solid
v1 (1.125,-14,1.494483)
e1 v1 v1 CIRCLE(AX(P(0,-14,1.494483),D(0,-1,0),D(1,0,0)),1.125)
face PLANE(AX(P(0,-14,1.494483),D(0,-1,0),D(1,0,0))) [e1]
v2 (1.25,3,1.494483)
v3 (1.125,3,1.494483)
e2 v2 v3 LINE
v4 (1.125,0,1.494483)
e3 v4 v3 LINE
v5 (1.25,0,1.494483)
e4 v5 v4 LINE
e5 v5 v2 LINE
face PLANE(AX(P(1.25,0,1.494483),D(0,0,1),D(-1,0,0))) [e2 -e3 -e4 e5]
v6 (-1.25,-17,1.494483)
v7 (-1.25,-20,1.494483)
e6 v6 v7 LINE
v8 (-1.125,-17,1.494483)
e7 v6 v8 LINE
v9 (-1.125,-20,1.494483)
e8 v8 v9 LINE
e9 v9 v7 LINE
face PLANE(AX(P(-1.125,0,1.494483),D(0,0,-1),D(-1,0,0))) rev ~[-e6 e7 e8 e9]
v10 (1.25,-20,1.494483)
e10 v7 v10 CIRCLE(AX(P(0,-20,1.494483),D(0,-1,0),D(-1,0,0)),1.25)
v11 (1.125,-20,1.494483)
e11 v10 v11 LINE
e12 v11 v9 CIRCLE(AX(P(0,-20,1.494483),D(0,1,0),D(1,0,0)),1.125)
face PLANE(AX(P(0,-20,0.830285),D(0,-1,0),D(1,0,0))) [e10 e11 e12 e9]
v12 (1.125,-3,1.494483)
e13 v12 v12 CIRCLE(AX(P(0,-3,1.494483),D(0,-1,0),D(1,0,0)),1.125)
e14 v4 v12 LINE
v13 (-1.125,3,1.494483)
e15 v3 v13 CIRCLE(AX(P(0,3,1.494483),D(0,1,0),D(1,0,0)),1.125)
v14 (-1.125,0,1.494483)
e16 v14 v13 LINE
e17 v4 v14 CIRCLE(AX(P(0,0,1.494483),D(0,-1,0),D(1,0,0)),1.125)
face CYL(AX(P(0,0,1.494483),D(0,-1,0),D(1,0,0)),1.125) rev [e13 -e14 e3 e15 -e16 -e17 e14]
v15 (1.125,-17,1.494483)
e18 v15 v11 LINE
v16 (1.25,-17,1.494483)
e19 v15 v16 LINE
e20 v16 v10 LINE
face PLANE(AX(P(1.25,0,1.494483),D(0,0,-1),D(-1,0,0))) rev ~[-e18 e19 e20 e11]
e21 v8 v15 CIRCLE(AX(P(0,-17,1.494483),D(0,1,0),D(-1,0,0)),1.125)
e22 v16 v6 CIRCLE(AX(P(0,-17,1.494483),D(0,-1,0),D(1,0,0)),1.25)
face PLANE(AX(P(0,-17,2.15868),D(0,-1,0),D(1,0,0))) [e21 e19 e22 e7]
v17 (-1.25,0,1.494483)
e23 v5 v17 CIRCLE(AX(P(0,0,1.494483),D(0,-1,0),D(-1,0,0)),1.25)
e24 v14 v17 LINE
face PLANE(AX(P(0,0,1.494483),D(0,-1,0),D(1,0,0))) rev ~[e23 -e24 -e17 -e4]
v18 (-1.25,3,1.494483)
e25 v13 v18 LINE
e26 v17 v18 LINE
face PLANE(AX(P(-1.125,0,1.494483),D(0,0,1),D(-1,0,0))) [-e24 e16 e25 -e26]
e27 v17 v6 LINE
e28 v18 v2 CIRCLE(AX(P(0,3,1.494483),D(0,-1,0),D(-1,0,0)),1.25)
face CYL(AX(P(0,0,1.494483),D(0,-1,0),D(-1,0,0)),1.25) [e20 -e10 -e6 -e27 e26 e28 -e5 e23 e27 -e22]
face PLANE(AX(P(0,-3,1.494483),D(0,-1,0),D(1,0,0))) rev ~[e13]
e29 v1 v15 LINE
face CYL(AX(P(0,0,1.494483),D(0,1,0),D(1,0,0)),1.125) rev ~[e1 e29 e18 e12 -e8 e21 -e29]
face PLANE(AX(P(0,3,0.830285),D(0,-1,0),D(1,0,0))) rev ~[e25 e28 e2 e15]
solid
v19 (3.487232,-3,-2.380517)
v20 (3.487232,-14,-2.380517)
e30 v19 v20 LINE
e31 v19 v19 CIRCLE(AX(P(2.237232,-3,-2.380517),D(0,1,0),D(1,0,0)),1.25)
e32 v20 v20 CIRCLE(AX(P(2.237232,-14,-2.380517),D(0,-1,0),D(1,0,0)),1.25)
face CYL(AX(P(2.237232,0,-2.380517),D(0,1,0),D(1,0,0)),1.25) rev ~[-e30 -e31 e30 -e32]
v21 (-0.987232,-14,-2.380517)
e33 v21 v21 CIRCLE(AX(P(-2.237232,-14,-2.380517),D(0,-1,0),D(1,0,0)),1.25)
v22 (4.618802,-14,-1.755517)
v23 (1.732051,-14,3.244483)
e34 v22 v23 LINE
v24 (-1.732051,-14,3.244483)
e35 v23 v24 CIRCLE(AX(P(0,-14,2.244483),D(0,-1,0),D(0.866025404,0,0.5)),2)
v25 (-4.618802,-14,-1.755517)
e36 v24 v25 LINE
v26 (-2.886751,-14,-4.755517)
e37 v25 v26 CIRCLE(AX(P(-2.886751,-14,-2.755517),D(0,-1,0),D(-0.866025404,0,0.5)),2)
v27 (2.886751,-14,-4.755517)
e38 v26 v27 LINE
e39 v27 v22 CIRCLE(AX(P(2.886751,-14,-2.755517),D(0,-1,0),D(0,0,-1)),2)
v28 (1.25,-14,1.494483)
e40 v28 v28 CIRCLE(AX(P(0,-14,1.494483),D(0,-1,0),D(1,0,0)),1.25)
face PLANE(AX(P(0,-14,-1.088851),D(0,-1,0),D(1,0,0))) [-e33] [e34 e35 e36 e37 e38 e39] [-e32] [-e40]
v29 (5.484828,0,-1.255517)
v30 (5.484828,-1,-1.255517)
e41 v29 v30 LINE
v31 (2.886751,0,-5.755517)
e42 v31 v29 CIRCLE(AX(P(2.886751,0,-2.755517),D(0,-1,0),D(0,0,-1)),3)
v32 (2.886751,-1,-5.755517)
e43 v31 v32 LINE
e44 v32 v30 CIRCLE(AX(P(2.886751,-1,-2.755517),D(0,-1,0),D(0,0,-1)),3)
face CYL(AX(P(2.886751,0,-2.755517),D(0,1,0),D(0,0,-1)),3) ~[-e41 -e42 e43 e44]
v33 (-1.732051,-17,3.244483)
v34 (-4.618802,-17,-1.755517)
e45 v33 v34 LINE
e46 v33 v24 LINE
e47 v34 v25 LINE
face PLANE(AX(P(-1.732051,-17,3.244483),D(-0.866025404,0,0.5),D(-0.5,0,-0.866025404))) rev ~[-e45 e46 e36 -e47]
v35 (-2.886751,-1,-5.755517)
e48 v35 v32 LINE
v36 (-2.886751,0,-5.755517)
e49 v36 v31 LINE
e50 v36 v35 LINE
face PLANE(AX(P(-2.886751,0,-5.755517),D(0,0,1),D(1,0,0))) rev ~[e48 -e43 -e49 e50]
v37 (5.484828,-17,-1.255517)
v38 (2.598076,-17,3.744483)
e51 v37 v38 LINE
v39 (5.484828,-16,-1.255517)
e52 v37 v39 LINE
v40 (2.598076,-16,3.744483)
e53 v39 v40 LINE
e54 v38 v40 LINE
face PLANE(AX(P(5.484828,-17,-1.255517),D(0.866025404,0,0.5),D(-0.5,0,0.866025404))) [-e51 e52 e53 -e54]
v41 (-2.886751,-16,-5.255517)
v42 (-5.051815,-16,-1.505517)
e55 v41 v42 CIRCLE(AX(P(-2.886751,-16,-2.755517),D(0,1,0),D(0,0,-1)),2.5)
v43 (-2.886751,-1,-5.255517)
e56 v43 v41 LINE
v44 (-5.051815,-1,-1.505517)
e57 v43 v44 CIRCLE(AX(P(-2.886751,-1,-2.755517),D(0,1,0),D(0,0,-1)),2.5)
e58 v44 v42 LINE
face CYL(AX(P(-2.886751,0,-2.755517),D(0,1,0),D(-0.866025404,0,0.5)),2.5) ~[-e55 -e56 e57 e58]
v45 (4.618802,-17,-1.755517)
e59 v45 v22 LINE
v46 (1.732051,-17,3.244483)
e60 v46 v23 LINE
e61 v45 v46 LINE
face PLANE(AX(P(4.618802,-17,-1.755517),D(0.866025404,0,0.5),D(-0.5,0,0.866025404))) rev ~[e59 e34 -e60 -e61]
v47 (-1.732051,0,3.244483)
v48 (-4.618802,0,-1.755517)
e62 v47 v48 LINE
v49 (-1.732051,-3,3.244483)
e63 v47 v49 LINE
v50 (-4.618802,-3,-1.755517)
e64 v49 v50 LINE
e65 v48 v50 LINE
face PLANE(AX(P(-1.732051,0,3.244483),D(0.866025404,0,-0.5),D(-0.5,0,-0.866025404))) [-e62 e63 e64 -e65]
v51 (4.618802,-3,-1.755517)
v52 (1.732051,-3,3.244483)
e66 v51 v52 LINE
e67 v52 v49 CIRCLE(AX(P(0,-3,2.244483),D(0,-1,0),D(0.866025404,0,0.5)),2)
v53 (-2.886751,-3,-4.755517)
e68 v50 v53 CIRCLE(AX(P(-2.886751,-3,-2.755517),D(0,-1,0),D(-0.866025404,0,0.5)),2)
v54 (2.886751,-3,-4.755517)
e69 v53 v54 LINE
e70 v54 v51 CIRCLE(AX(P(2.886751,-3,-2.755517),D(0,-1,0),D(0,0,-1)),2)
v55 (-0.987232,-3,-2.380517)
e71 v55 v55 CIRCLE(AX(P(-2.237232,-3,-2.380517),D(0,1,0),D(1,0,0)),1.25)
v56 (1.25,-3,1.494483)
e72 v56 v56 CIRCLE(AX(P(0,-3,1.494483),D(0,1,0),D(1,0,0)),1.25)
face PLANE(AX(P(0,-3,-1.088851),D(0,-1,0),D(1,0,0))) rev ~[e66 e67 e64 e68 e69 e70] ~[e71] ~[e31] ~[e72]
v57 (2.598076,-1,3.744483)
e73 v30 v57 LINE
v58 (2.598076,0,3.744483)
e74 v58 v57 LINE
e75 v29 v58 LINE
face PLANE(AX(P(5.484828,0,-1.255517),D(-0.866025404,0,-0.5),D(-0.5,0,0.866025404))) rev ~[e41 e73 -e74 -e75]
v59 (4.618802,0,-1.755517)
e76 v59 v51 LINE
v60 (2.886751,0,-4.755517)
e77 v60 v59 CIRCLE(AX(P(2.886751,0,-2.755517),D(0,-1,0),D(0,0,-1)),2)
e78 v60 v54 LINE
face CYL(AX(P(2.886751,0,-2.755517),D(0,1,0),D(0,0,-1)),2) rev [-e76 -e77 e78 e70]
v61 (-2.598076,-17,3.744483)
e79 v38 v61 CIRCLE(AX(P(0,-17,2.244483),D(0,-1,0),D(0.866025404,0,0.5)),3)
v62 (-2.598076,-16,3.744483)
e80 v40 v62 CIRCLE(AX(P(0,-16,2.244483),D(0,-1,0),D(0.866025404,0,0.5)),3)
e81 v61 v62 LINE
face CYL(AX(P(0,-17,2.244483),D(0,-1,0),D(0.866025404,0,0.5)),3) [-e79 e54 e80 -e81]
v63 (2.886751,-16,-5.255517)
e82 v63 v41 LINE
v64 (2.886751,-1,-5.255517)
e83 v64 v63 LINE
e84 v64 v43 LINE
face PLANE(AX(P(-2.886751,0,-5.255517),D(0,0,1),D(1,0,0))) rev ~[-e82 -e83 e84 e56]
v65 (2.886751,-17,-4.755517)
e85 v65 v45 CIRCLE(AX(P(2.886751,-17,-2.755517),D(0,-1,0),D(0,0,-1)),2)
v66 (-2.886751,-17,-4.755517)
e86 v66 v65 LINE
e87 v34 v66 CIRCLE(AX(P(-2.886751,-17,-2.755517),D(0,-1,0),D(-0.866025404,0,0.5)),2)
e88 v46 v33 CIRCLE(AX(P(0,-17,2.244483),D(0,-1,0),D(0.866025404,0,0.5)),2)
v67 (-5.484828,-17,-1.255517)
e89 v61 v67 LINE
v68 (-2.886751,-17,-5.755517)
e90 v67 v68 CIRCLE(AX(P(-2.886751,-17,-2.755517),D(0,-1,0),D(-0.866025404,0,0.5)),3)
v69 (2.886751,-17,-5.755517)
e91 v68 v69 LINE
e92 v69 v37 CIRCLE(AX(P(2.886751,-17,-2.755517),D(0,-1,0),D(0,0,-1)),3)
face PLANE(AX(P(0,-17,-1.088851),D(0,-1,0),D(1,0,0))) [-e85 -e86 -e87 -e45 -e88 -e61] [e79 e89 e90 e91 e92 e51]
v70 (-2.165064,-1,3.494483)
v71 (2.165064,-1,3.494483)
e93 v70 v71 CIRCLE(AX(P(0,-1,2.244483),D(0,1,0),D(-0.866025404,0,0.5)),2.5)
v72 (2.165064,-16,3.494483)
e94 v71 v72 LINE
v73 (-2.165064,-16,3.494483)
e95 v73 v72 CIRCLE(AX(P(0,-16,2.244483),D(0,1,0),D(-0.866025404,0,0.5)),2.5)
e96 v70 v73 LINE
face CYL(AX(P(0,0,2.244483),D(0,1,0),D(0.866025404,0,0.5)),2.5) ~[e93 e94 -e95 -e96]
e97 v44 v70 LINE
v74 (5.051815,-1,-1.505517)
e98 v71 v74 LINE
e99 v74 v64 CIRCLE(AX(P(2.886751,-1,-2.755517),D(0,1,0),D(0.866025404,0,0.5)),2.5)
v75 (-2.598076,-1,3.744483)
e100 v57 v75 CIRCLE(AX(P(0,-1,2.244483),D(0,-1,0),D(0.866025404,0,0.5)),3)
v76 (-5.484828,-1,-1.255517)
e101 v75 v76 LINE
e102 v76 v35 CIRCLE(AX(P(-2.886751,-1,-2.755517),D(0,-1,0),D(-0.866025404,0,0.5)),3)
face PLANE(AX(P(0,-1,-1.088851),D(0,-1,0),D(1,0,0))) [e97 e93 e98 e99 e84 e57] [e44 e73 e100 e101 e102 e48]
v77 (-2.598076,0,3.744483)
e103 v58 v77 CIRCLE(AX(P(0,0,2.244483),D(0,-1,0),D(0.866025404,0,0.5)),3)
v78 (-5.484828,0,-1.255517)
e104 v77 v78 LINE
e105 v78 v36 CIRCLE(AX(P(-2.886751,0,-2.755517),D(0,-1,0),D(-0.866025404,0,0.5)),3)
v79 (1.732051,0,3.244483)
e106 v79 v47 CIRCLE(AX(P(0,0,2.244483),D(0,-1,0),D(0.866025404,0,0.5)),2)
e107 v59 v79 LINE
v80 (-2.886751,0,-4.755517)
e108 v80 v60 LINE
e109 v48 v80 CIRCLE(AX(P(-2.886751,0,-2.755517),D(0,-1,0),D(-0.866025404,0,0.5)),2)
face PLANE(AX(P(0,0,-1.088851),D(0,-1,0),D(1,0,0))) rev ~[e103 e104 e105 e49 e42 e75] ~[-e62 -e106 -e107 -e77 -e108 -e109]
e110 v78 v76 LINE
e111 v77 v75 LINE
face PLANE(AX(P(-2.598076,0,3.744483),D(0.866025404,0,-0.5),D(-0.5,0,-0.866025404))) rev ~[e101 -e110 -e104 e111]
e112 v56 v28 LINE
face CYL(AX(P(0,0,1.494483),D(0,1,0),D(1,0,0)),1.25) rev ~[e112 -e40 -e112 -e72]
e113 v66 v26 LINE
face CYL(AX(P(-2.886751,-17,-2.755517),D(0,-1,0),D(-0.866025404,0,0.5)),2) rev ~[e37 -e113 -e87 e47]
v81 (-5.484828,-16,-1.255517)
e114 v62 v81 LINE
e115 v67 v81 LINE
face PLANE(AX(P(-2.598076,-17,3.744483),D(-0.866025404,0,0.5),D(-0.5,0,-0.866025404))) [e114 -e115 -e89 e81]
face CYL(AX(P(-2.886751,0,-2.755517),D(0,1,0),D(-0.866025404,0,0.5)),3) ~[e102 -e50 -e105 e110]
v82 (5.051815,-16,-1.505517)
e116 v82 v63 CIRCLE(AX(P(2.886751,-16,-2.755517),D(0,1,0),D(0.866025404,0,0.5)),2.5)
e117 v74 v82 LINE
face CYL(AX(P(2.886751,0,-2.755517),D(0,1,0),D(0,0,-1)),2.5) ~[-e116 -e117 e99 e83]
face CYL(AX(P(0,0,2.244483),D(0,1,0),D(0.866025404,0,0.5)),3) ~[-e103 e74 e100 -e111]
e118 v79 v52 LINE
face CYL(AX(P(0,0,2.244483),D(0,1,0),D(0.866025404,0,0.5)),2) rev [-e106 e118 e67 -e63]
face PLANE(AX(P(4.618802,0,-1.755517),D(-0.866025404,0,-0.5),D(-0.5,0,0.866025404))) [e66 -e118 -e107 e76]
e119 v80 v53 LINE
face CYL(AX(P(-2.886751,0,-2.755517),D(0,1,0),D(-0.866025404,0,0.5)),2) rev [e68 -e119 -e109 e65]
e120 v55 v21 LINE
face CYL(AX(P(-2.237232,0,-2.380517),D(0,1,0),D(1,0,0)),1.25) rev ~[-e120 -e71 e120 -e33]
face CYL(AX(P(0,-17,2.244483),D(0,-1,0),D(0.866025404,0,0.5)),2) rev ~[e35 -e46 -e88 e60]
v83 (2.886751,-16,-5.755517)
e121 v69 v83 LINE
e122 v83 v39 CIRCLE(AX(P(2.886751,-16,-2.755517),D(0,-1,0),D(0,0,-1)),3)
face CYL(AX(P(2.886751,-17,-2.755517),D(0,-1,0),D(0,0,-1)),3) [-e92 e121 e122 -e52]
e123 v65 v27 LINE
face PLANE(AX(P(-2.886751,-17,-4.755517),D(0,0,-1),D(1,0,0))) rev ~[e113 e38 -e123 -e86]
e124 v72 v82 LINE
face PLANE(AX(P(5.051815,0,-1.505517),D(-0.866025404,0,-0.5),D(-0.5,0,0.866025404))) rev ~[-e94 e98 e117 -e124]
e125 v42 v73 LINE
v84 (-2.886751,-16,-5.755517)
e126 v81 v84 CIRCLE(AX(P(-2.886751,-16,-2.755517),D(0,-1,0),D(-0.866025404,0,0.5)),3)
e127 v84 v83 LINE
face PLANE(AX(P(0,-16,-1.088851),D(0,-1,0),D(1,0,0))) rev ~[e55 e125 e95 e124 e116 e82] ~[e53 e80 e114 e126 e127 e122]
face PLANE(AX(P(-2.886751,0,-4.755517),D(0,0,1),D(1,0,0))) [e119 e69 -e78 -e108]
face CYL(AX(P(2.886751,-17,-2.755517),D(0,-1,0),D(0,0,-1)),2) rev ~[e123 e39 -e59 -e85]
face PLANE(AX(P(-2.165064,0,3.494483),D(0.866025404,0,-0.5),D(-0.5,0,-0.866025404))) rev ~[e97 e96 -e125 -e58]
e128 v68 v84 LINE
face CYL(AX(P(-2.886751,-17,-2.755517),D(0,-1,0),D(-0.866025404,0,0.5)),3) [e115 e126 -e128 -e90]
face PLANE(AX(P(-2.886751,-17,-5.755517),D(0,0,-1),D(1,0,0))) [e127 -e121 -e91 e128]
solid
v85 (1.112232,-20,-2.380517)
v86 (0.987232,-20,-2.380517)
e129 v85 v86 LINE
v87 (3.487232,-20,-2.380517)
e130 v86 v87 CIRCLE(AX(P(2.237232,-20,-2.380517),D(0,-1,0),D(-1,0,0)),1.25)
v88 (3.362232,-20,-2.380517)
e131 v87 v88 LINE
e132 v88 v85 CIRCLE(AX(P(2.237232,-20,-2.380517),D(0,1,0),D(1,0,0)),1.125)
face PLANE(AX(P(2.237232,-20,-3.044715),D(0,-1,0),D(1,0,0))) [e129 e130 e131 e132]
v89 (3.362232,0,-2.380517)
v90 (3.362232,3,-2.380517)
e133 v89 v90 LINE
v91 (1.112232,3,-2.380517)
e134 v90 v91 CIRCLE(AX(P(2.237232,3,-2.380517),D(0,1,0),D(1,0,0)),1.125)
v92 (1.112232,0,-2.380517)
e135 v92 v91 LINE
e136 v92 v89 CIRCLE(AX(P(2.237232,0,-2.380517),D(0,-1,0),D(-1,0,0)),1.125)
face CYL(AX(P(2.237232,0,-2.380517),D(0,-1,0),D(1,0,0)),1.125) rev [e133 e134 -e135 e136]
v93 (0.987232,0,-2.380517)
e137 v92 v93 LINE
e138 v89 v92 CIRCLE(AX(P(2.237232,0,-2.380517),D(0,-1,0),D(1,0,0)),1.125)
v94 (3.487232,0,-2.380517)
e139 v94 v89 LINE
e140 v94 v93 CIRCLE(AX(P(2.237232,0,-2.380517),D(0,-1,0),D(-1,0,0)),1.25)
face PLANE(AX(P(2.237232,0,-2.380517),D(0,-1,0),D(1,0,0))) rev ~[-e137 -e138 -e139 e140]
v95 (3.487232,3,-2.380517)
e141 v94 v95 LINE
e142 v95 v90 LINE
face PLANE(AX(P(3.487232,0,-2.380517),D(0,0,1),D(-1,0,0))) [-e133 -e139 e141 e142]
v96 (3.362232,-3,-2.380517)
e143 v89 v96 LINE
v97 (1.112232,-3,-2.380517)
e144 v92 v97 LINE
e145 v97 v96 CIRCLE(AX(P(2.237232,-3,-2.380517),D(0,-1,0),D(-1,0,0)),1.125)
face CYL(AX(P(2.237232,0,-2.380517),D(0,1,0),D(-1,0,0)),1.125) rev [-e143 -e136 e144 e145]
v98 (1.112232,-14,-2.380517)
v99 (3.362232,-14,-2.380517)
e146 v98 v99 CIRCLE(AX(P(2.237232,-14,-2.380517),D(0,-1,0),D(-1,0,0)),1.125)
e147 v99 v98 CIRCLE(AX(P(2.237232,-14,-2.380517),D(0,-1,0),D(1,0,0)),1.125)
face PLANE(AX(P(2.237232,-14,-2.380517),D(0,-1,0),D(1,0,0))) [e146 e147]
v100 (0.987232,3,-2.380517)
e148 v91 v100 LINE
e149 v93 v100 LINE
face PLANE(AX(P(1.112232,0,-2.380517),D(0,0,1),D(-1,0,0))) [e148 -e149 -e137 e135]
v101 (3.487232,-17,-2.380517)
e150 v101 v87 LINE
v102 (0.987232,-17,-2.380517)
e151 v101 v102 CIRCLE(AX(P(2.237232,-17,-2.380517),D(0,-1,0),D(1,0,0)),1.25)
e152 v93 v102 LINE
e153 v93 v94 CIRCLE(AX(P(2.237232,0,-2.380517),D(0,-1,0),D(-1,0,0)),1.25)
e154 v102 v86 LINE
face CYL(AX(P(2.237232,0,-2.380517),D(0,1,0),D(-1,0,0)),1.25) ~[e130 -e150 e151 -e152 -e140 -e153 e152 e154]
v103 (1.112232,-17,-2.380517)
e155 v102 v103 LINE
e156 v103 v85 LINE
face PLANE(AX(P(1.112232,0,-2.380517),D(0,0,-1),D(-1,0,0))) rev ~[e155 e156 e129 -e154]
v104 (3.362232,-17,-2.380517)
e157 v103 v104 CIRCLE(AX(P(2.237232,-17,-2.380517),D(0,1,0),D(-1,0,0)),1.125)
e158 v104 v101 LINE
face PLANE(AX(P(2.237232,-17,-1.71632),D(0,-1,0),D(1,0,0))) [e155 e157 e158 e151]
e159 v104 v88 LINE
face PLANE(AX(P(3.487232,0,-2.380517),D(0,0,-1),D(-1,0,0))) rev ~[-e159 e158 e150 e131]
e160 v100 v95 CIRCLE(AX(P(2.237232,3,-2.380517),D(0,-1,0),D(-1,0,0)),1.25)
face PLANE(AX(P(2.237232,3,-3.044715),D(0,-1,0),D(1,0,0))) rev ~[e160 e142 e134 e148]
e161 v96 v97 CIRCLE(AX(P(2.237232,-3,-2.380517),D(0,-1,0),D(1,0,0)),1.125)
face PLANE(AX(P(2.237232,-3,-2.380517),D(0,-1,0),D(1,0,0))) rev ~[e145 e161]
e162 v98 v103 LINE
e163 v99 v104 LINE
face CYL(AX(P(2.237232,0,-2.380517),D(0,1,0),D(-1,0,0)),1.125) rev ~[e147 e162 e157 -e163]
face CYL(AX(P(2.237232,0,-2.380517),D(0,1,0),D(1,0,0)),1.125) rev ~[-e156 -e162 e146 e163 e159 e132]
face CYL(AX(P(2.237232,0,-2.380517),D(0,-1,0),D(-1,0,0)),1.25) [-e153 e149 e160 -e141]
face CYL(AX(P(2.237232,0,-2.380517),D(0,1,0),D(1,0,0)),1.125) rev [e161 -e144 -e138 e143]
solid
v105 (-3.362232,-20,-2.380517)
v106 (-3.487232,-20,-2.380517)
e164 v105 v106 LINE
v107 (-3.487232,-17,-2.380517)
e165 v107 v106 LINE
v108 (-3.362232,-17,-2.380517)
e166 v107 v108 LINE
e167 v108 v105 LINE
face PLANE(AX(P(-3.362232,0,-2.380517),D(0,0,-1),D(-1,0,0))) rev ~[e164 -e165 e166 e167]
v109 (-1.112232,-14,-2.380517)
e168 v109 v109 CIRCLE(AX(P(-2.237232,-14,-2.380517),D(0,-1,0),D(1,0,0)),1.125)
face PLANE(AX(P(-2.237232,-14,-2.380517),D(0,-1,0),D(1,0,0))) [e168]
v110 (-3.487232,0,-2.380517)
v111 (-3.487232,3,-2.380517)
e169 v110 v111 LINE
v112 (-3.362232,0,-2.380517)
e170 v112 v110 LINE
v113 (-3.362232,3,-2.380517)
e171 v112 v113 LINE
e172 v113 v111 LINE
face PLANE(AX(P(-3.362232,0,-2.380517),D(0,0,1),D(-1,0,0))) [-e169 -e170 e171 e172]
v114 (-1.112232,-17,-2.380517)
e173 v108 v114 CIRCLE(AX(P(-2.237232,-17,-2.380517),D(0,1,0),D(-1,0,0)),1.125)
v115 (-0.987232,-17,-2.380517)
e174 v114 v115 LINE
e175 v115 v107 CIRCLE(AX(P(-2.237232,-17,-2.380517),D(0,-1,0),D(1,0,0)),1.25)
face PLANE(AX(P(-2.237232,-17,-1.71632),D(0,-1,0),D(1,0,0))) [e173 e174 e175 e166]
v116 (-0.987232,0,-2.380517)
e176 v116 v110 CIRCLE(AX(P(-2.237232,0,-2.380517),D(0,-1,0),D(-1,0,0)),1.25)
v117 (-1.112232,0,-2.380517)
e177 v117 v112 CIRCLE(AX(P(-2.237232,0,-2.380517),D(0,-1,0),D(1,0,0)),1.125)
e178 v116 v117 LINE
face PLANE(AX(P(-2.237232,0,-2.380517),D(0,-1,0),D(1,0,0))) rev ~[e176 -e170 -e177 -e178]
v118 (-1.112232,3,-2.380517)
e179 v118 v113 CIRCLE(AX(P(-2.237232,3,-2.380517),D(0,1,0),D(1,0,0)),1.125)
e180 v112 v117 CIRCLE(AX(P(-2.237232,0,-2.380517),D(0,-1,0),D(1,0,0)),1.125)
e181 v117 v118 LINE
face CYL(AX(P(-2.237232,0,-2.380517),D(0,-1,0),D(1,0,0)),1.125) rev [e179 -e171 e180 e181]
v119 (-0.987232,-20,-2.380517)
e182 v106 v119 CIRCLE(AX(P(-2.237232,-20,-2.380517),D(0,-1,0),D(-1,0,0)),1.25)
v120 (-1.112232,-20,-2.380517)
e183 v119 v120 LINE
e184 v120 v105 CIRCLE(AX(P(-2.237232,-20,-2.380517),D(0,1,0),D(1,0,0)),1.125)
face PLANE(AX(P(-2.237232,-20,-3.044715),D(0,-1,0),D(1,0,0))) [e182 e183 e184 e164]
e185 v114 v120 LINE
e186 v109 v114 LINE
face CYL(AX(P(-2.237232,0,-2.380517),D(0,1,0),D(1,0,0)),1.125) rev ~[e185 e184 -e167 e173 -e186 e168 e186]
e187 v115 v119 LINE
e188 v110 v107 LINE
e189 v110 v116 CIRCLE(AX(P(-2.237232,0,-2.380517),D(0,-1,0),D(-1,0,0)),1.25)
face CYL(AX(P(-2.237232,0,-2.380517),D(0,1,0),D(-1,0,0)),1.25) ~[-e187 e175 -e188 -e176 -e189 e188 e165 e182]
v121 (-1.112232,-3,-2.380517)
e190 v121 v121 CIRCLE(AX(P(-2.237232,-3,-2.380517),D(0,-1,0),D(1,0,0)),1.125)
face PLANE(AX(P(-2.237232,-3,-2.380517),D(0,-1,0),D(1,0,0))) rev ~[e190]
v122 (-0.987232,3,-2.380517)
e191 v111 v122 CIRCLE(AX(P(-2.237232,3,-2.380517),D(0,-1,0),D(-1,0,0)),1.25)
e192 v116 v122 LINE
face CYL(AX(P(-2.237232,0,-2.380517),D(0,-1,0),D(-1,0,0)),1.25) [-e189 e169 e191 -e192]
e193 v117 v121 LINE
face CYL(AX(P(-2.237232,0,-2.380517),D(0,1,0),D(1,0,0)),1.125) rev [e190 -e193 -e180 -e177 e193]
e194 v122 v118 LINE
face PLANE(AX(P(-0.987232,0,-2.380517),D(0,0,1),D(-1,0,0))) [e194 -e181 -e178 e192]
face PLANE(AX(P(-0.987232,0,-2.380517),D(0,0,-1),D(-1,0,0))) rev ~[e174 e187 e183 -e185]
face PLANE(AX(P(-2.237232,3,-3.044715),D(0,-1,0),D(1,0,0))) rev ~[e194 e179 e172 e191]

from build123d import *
from build123d import SkipClean  # not in build123d's __all__

# Parameters (mm, degrees)
F1_DEPTH  = 17
F2_DEPTH  = 1
F3_DEPTH  = 3
F4_DEPTH  = 17
F5_DEPTH  = 20
F6_DEPTH  = 14
F7_DEPTH  = 3
F8_DEPTH  = 3
F10_DEPTH = 1
F9_R      = 1.25
F11_DEPTH = 3


with BuildPart() as f1:
    # F0 (on Front) → F1 (new body)
    with BuildSketch(Plane.XZ):
        with BuildLine():
            Line((-2.1650635095, 3.4944827652), (-5.0518148554, -1.5055172348))
            ThreePointArc((-5.0518148554, -1.5055172348), (-5.0518148554, -4.0055172348), (-2.8867513459, -5.2555172348))
            Line((-2.8867513459, -5.2555172348), (2.8867513459, -5.2555172348))
            ThreePointArc((2.8867513459, -5.2555172348), (5.0518148554, -4.0055172348), (5.0518148554, -1.5055172348))
            Line((5.0518148554, -1.5055172348), (2.1650635095, 3.4944827652))
            ThreePointArc((2.1650635095, 3.4944827652), (0, 4.7444827652), (-2.1650635095, 3.4944827652))
        make_face()
        with BuildLine():
            ThreePointArc((-2.8867513459, -4.7555172348), (-4.6188021535, -3.7555172348), (-4.6188021535, -1.7555172348))
            Line((-4.6188021535, -1.7555172348), (-1.7320508076, 3.2444827652))
            ThreePointArc((-1.7320508076, 3.2444827652), (0, 4.2444827652), (1.7320508076, 3.2444827652))
            Line((1.7320508076, 3.2444827652), (4.6188021535, -1.7555172348))
            ThreePointArc((4.6188021535, -1.7555172348), (4.6188021535, -3.7555172348), (2.8867513459, -4.7555172348))
            Line((2.8867513459, -4.7555172348), (-2.8867513459, -4.7555172348))
        make_face(mode=Mode.SUBTRACT)
        with BuildLine():
            Line((-1.7320508076, 3.2444827652), (-4.6188021535, -1.7555172348))
            ThreePointArc((-4.6188021535, -1.7555172348), (-4.6188021535, -3.7555172348), (-2.8867513459, -4.7555172348))
            Line((-2.8867513459, -4.7555172348), (2.8867513459, -4.7555172348))
            ThreePointArc((2.8867513459, -4.7555172348), (4.6188021535, -3.7555172348), (4.6188021535, -1.7555172348))
            Line((4.6188021535, -1.7555172348), (1.7320508076, 3.2444827652))
            ThreePointArc((1.7320508076, 3.2444827652), (0, 4.2444827652), (-1.7320508076, 3.2444827652))
        make_face()
        with BuildLine():
            ThreePointArc((-3.4872322931, -2.3805172348), (-2.2372322931, -1.1305172348), (-0.9872322931, -2.3805172348))
            ThreePointArc((-0.9872322931, -2.3805172348), (-2.2372322931, -3.6305172348), (-3.4872322931, -2.3805172348))
        make_face(mode=Mode.SUBTRACT)
        with BuildLine():
            ThreePointArc((0.9872322931, -2.3805172348), (2.2372322931, -1.1305172348), (3.4872322931, -2.3805172348))
            ThreePointArc((3.4872322931, -2.3805172348), (2.2372322931, -3.6305172348), (0.9872322931, -2.3805172348))
        make_face(mode=Mode.SUBTRACT)
        with BuildLine():
            ThreePointArc((-1.25, 1.4944827652), (0, 2.7444827652), (1.25, 1.4944827652))
            ThreePointArc((1.25, 1.4944827652), (0, 0.2444827652), (-1.25, 1.4944827652))
        make_face(mode=Mode.SUBTRACT)
    extrude(amount=F1_DEPTH)

    # F0 (on Front) → F2 (join)
    with BuildSketch(Plane.XZ):
        with BuildLine():
            Line((-2.5980762114, 3.7444827652), (-5.4848275573, -1.2555172348))
            ThreePointArc((-5.4848275573, -1.2555172348), (-5.4848275573, -4.2555172348), (-2.8867513459, -5.7555172348))
            Line((-2.8867513459, -5.7555172348), (2.8867513459, -5.7555172348))
            ThreePointArc((2.8867513459, -5.7555172348), (5.4848275573, -4.2555172348), (5.4848275573, -1.2555172348))
            Line((5.4848275573, -1.2555172348), (2.5980762114, 3.7444827652))
            ThreePointArc((2.5980762114, 3.7444827652), (0, 5.2444827652), (-2.5980762114, 3.7444827652))
        make_face()
        with BuildLine():
            ThreePointArc((-2.8867513459, -5.2555172348), (-5.0518148554, -4.0055172348), (-5.0518148554, -1.5055172348))
            Line((-5.0518148554, -1.5055172348), (-2.1650635095, 3.4944827652))
            ThreePointArc((-2.1650635095, 3.4944827652), (0, 4.7444827652), (2.1650635095, 3.4944827652))
            Line((2.1650635095, 3.4944827652), (5.0518148554, -1.5055172348))
            ThreePointArc((5.0518148554, -1.5055172348), (5.0518148554, -4.0055172348), (2.8867513459, -5.2555172348))
            Line((2.8867513459, -5.2555172348), (-2.8867513459, -5.2555172348))
        make_face(mode=Mode.SUBTRACT)
    extrude(amount=F2_DEPTH)

    # F0 (on Front) → F3 (cut)
    with BuildSketch(Plane.XZ):
        with BuildLine():
            Line((-1.7320508076, 3.2444827652), (-4.6188021535, -1.7555172348))
            ThreePointArc((-4.6188021535, -1.7555172348), (-4.6188021535, -3.7555172348), (-2.8867513459, -4.7555172348))
            Line((-2.8867513459, -4.7555172348), (2.8867513459, -4.7555172348))
            ThreePointArc((2.8867513459, -4.7555172348), (4.6188021535, -3.7555172348), (4.6188021535, -1.7555172348))
            Line((4.6188021535, -1.7555172348), (1.7320508076, 3.2444827652))
            ThreePointArc((1.7320508076, 3.2444827652), (0, 4.2444827652), (-1.7320508076, 3.2444827652))
        make_face()
        with BuildLine():
            ThreePointArc((-3.4872322931, -2.3805172348), (-2.2372322931, -1.1305172348), (-0.9872322931, -2.3805172348))
            ThreePointArc((-0.9872322931, -2.3805172348), (-2.2372322931, -3.6305172348), (-3.4872322931, -2.3805172348))
        make_face(mode=Mode.SUBTRACT)
        with BuildLine():
            ThreePointArc((0.9872322931, -2.3805172348), (2.2372322931, -1.1305172348), (3.4872322931, -2.3805172348))
            ThreePointArc((3.4872322931, -2.3805172348), (2.2372322931, -3.6305172348), (0.9872322931, -2.3805172348))
        make_face(mode=Mode.SUBTRACT)
        with BuildLine():
            ThreePointArc((-1.25, 1.4944827652), (0, 2.7444827652), (1.25, 1.4944827652))
            ThreePointArc((1.25, 1.4944827652), (0, 0.2444827652), (-1.25, 1.4944827652))
        make_face(mode=Mode.SUBTRACT)
        with BuildLine():
            ThreePointArc((1.112232334, -2.3805172348), (2.2372322931, -3.5055171939), (3.3622322522, -2.3805172348))
            ThreePointArc((3.3622322522, -2.3805172348), (2.2372322931, -1.2555172756), (1.112232334, -2.3805172348))
        make_face()
        with BuildLine():
            ThreePointArc((-1.125, 1.4944827652), (0, 0.3694827652), (1.125, 1.4944827652))
            ThreePointArc((1.125, 1.4944827652), (0, 2.6194827652), (-1.125, 1.4944827652))
        make_face()
        with BuildLine():
            ThreePointArc((-3.3622322931, -2.3805172348), (-2.2372322931, -3.5055172348), (-1.1122322931, -2.3805172348))
            ThreePointArc((-1.1122322931, -2.3805172348), (-2.2372322931, -1.2555172348), (-3.3622322931, -2.3805172348))
        make_face()
    extrude(amount=F3_DEPTH, mode=Mode.SUBTRACT)

    # F9 (on face) → F10 (join)
    with BuildSketch(Plane.XZ.offset(17)):
        with BuildLine():
            Line((-2.5980762912, 3.7444828113), (-5.4848276371, -1.2555171887))
            ThreePointArc((-5.4848276371, -1.2555171887), (-5.4848276371, -4.2555172809), (-2.8867513459, -5.7555173269))
            Line((-2.8867513459, -5.7555173269), (2.8867513459, -5.7555173269))
            ThreePointArc((2.8867513459, -5.7555173269), (5.4848276371, -4.2555172809), (5.4848276371, -1.2555171887))
            Line((5.4848276371, -1.2555171887), (2.5980762912, 3.7444828113))
            ThreePointArc((2.5980762912, 3.7444828113), (0, 5.2444828574), (-2.5980762912, 3.7444828113))
        make_face()
        with BuildLine():
            Line((-5.0518148554, -1.5055172348), (-2.1650635095, 3.4944827652))
            ThreePointArc((-2.1650635095, 3.4944827652), (0, 4.7444827652), (2.1650635095, 3.4944827652))
            Line((2.1650635095, 3.4944827652), (5.0518148554, -1.5055172348))
            ThreePointArc((5.0518148554, -1.5055172348), (5.0518148554, -4.0055172348), (2.8867513459, -5.2555172348))
            Line((2.8867513459, -5.2555172348), (-2.8867513459, -5.2555172348))
            ThreePointArc((-2.8867513459, -5.2555172348), (-5.0518148554, -4.0055172348), (-5.0518148554, -1.5055172348))
        make_face(mode=Mode.SUBTRACT)
    extrude(amount=-F10_DEPTH)

    # F9 (on face) → F11 (cut)
    with BuildSketch(Plane.XZ.offset(17)):
        with BuildLine():
            Line((-1.7320508399, 3.2444827839), (-4.6188021858, -1.7555172161))
            ThreePointArc((-4.6188021858, -1.7555172161), (-4.6188021858, -3.7555172534), (-2.8867513459, -4.7555172721))
            Line((-2.8867513459, -4.7555172721), (2.8867513459, -4.7555172721))
            ThreePointArc((2.8867513459, -4.7555172721), (4.6188021858, -3.7555172534), (4.6188021858, -1.7555172161))
            Line((4.6188021858, -1.7555172161), (1.7320508399, 3.2444827839))
            ThreePointArc((1.7320508399, 3.2444827839), (0, 4.2444828025), (-1.7320508399, 3.2444827839))
        make_face()
        with Locations((-2.2372322931, -2.3805172348)):
            Circle(F9_R, mode=Mode.SUBTRACT)
        with Locations((2.2372322931, -2.3805172348)):
            Circle(F9_R, mode=Mode.SUBTRACT)
        with Locations((0, 1.4944827652)):
            Circle(F9_R, mode=Mode.SUBTRACT)
    extrude(amount=-F11_DEPTH, mode=Mode.SUBTRACT)


with BuildPart() as f4:
    # F0 (on Front) → F4 (new body)
    with BuildSketch(Plane.XZ):
        with BuildLine():
            Line((3.3622322522, -2.3805172348), (3.4872322931, -2.3805172348))
            ThreePointArc((3.4872322931, -2.3805172348), (2.2372322931, -1.1305172348), (0.9872322931, -2.3805172348))
            Line((0.9872322931, -2.3805172348), (1.112232334, -2.3805172348))
            ThreePointArc((1.112232334, -2.3805172348), (2.2372322931, -1.2555172756), (3.3622322522, -2.3805172348))
        make_face()
    extrude(amount=F4_DEPTH)

    # F0 (on Front) → F5 (join)
    with BuildSketch(Plane.XZ):
        with BuildLine():
            ThreePointArc((0.9872322931, -2.3805172348), (2.2372322931, -3.6305172348), (3.4872322931, -2.3805172348))
            Line((3.4872322931, -2.3805172348), (3.3622322522, -2.3805172348))
            ThreePointArc((3.3622322522, -2.3805172348), (2.2372322931, -3.5055171939), (1.112232334, -2.3805172348))
            Line((1.112232334, -2.3805172348), (0.9872322931, -2.3805172348))
        make_face()
    extrude(amount=F5_DEPTH)

    # F0 (on Front) → F6, piece 2 (join)
    with BuildSketch(Plane.XZ):
        with BuildLine():
            ThreePointArc((1.112232334, -2.3805172348), (2.2372322931, -3.5055171939), (3.3622322522, -2.3805172348))
            ThreePointArc((3.3622322522, -2.3805172348), (2.2372322931, -1.2555172756), (1.112232334, -2.3805172348))
        make_face()
    extrude(amount=F6_DEPTH)


with BuildPart() as f4b:
    # F0 (on Front) → F4, piece 2 (new body)
    with BuildSketch(Plane.XZ):
        with BuildLine():
            Line((1.125, 1.4944827652), (1.25, 1.4944827652))
            ThreePointArc((1.25, 1.4944827652), (0, 2.7444827652), (-1.25, 1.4944827652))
            Line((-1.25, 1.4944827652), (-1.125, 1.4944827652))
            ThreePointArc((-1.125, 1.4944827652), (0, 2.6194827652), (1.125, 1.4944827652))
        make_face()
    extrude(amount=F4_DEPTH)

    # F0 (on Front) → F5, piece 3 (join)
    with BuildSketch(Plane.XZ):
        with BuildLine():
            ThreePointArc((-1.25, 1.4944827652), (0, 0.2444827652), (1.25, 1.4944827652))
            Line((1.25, 1.4944827652), (1.125, 1.4944827652))
            ThreePointArc((1.125, 1.4944827652), (0, 0.3694827652), (-1.125, 1.4944827652))
            Line((-1.125, 1.4944827652), (-1.25, 1.4944827652))
        make_face()
    extrude(amount=F5_DEPTH)

    # F0 (on Front) → F6 (join)
    with BuildSketch(Plane.XZ):
        with BuildLine():
            ThreePointArc((-1.125, 1.4944827652), (0, 0.3694827652), (1.125, 1.4944827652))
            ThreePointArc((1.125, 1.4944827652), (0, 2.6194827652), (-1.125, 1.4944827652))
        make_face()
    extrude(amount=F6_DEPTH)


with BuildPart() as f4c:
    # F0 (on Front) → F4, piece 3 (new body)
    with BuildSketch(Plane.XZ):
        with BuildLine():
            Line((-1.1122322931, -2.3805172348), (-0.9872322931, -2.3805172348))
            ThreePointArc((-0.9872322931, -2.3805172348), (-2.2372322931, -1.1305172348), (-3.4872322931, -2.3805172348))
            Line((-3.4872322931, -2.3805172348), (-3.3622322931, -2.3805172348))
            ThreePointArc((-3.3622322931, -2.3805172348), (-2.2372322931, -1.2555172348), (-1.1122322931, -2.3805172348))
        make_face()
    extrude(amount=F4_DEPTH)

    # F0 (on Front) → F5, piece 2 (join)
    with BuildSketch(Plane.XZ):
        with BuildLine():
            ThreePointArc((-3.4872322931, -2.3805172348), (-2.2372322931, -3.6305172348), (-0.9872322931, -2.3805172348))
            Line((-0.9872322931, -2.3805172348), (-1.1122322931, -2.3805172348))
            ThreePointArc((-1.1122322931, -2.3805172348), (-2.2372322931, -3.5055172348), (-3.3622322931, -2.3805172348))
            Line((-3.3622322931, -2.3805172348), (-3.4872322931, -2.3805172348))
        make_face()
    extrude(amount=F5_DEPTH)

    # F0 (on Front) → F6, piece 3 (join)
    with BuildSketch(Plane.XZ):
        with BuildLine():
            ThreePointArc((-3.3622322931, -2.3805172348), (-2.2372322931, -3.5055172348), (-1.1122322931, -2.3805172348))
            ThreePointArc((-1.1122322931, -2.3805172348), (-2.2372322931, -1.2555172348), (-3.3622322931, -2.3805172348))
        make_face()
    extrude(amount=F6_DEPTH)


with BuildPart() as f7_tool:
    # F0 (on Front) → F7 (new body, through all)
    with BuildSketch(Plane.XZ):
        with BuildLine():
            ThreePointArc((-1.125, 1.4944827652), (0, 0.3694827652), (1.125, 1.4944827652))
            ThreePointArc((1.125, 1.4944827652), (0, 2.6194827652), (-1.125, 1.4944827652))
        make_face()
        with BuildLine():
            ThreePointArc((-3.3622322931, -2.3805172348), (-2.2372322931, -3.5055172348), (-1.1122322931, -2.3805172348))
            ThreePointArc((-1.1122322931, -2.3805172348), (-2.2372322931, -1.2555172348), (-3.3622322931, -2.3805172348))
        make_face()
        with BuildLine():
            ThreePointArc((1.112232334, -2.3805172348), (2.2372322931, -3.5055171939), (3.3622322522, -2.3805172348))
            ThreePointArc((3.3622322522, -2.3805172348), (2.2372322931, -1.2555172756), (1.112232334, -2.3805172348))
        make_face()
    extrude(amount=F7_DEPTH)


with BuildPart() as f4_1:
    add(f4.part, clean=False)

    # F7: cut by f7_tool
    add(f7_tool.part, mode=Mode.SUBTRACT)

    # F0 (on Front) → F8 (join)
    with BuildSketch(Plane.XZ):
        with BuildLine():
            ThreePointArc((0.9872322931, -2.3805172348), (2.2372322931, -3.6305172348), (3.4872322931, -2.3805172348))
            Line((3.4872322931, -2.3805172348), (3.3622322522, -2.3805172348))
            ThreePointArc((3.3622322522, -2.3805172348), (2.2372322931, -3.5055171939), (1.112232334, -2.3805172348))
            Line((1.112232334, -2.3805172348), (0.9872322931, -2.3805172348))
        make_face()
    with SkipClean():  # cleaning this boolean's faces spoils the solid; the shape is the same uncleaned
        extrude(amount=-F8_DEPTH)


with BuildPart() as f4b_1:
    add(f4b.part, clean=False)

    # F7: cut by f7_tool
    add(f7_tool.part, mode=Mode.SUBTRACT)

    # F0 (on Front) → F8, piece 3 (join)
    with BuildSketch(Plane.XZ):
        with BuildLine():
            ThreePointArc((-1.25, 1.4944827652), (0, 0.2444827652), (1.25, 1.4944827652))
            Line((1.25, 1.4944827652), (1.125, 1.4944827652))
            ThreePointArc((1.125, 1.4944827652), (0, 0.3694827652), (-1.125, 1.4944827652))
            Line((-1.125, 1.4944827652), (-1.25, 1.4944827652))
        make_face()
    extrude(amount=-F8_DEPTH)


with BuildPart() as f4c_1:
    add(f4c.part, clean=False)

    # F7: cut by f7_tool
    add(f7_tool.part, mode=Mode.SUBTRACT)

    # F0 (on Front) → F8, piece 2 (join)
    with BuildSketch(Plane.XZ):
        with BuildLine():
            ThreePointArc((-3.4872322931, -2.3805172348), (-2.2372322931, -3.6305172348), (-0.9872322931, -2.3805172348))
            Line((-0.9872322931, -2.3805172348), (-1.1122322931, -2.3805172348))
            ThreePointArc((-1.1122322931, -2.3805172348), (-2.2372322931, -3.5055172348), (-3.3622322931, -2.3805172348))
            Line((-3.3622322931, -2.3805172348), (-3.4872322931, -2.3805172348))
        make_face()
    with SkipClean():  # cleaning this boolean's faces spoils the solid; the shape is the same uncleaned
        extrude(amount=-F8_DEPTH)


solid = Compound([f1.part, f4_1.part, f4b_1.part, f4c_1.part])
